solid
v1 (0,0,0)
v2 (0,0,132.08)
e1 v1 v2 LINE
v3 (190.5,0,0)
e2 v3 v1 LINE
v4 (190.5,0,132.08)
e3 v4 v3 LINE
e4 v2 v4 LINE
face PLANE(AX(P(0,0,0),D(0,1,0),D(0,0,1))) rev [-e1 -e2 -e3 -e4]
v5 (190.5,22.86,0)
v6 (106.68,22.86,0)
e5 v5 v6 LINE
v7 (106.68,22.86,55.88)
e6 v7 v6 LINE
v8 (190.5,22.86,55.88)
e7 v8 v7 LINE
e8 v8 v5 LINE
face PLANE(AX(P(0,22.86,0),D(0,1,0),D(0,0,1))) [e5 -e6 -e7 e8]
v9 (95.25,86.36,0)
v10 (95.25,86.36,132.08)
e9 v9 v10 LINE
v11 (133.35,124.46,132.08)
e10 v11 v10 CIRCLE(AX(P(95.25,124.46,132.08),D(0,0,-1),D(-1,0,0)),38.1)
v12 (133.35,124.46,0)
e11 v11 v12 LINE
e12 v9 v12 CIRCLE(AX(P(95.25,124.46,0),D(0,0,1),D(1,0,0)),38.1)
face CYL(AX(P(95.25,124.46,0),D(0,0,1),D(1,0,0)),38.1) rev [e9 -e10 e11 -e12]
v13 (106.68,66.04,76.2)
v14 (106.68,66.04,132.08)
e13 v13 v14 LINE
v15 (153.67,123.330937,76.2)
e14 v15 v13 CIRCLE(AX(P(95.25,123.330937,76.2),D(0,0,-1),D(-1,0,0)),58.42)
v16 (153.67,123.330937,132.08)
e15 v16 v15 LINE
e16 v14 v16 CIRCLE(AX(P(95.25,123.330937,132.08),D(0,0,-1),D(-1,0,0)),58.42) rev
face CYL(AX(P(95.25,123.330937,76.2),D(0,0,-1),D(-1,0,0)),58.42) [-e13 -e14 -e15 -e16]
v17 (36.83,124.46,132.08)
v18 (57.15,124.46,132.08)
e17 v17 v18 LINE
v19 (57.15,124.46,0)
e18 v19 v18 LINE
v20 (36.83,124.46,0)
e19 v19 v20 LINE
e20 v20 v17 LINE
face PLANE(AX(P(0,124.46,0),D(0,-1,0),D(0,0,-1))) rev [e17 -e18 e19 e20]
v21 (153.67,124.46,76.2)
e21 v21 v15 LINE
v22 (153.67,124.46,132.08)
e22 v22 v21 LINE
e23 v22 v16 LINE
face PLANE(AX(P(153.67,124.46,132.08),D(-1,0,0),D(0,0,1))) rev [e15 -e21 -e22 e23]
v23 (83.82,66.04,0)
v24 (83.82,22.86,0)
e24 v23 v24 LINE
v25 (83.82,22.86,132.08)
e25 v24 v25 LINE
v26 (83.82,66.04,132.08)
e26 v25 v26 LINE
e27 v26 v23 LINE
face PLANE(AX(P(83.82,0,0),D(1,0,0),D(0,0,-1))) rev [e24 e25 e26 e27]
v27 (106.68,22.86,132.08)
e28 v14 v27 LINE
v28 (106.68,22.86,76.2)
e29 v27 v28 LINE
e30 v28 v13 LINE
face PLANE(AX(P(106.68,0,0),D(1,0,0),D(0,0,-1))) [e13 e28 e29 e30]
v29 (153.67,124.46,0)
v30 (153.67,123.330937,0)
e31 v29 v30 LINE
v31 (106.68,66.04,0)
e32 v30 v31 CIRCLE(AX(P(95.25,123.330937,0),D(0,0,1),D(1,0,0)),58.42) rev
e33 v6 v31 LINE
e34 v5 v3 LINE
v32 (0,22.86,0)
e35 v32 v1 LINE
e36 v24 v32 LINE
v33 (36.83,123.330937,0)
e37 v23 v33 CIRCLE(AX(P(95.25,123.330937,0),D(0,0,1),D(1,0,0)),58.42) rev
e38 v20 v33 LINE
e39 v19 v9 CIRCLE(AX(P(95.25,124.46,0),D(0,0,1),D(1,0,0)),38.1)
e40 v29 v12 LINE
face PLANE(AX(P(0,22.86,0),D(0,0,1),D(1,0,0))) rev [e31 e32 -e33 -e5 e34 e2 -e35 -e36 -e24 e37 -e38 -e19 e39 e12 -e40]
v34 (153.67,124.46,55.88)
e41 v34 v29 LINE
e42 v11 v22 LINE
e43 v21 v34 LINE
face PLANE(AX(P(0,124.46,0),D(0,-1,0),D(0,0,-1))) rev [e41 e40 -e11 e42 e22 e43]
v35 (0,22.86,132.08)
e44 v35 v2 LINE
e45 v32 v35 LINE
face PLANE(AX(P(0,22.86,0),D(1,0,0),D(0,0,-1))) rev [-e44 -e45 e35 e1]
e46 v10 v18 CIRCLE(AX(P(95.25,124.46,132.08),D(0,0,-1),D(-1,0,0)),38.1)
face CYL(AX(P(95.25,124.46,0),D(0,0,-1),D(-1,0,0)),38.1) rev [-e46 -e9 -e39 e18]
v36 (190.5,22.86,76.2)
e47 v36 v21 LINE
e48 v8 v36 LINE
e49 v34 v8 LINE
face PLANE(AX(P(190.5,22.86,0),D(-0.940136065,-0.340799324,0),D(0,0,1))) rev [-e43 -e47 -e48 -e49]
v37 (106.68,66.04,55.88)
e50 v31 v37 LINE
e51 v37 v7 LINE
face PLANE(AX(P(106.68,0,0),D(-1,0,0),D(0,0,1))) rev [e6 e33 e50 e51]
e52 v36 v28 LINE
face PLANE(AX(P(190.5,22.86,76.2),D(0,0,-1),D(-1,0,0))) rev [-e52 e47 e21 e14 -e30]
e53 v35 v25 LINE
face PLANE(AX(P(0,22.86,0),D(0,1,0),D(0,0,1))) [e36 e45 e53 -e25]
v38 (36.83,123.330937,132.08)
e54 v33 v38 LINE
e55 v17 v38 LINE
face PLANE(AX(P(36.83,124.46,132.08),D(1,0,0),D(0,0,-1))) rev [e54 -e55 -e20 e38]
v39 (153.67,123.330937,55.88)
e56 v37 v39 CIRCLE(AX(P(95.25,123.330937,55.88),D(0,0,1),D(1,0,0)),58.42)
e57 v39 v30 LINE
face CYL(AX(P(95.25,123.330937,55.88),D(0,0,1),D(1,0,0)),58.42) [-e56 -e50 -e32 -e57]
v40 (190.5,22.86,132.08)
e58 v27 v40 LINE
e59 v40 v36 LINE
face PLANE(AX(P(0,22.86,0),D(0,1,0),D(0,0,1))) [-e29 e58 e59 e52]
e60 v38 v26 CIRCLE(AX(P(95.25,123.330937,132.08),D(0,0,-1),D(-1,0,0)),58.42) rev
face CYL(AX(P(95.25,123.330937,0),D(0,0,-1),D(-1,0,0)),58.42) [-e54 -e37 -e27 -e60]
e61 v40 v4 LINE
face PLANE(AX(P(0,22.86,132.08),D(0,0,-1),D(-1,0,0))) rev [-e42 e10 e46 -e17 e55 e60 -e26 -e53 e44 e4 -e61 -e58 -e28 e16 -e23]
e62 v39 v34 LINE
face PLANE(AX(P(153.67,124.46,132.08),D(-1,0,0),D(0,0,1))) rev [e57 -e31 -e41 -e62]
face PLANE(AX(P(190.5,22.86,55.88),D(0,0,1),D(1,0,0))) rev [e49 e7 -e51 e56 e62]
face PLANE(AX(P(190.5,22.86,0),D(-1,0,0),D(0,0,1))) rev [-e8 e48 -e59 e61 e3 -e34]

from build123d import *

# Parameters (mm, degrees)
SKETCH1_W           = 190.5
SKETCH1_H           = 132.08
BOSS_EXTRUDE1_DEPTH = 22.86
SKETCH2_W           = 116.84
SKETCH2_H           = 132.08
BOSS_EXTRUDE2_DEPTH = 101.6
SKETCH3_W           = 20.32
SKETCH3_H           = 101.6
BOSS_EXTRUDE3_DEPTH = 36.83
SKETCH5_W           = 55.88
SKETCH5_H           = 43.18
CUT_EXTRUDE1_DEPTH  = 46.99
SKETCH4_W           = 55.88
SKETCH4_H           = 43.18
CUT_EXTRUDE2_DEPTH  = 46.99
SKETCH6_W           = 132.08
SKETCH6_H           = 43.18
CUT_EXTRUDE3_DEPTH  = 46.99
SKETCH10_W          = 76.2
SKETCH10_H          = 132.08
CUT_EXTRUDE4_DEPTH  = 38.1
CHAMFER1_SIZE       = 36.83
CHAMFER1_SIZE2      = 101.6
FILLET1_R           = 58.42
FILLET2_R           = 38.1


# Some blends are built 0.0001 mm under size
with BuildPart() as part:
    # Sketch1 → Boss-Extrude1 (new body)
    with BuildSketch(Plane(origin=(0, 0, 0), x_dir=(1, 0, 0), z_dir=(0, 1, 0))):
        with Locations((95.25, -66.04)):
            Rectangle(SKETCH1_W, SKETCH1_H)
    extrude(amount=BOSS_EXTRUDE1_DEPTH)

    # Sketch2 → Boss-Extrude2 (add)
    with BuildSketch(Plane(origin=(0, 22.86, 0), x_dir=(1, 0, 0), z_dir=(0, 1, 0))):
        with Locations((95.25, -66.04)):
            Rectangle(SKETCH2_W, SKETCH2_H)
    extrude(amount=BOSS_EXTRUDE2_DEPTH)

    # Sketch3 → Boss-Extrude3 (add)
    with BuildSketch(Plane(origin=(153.67, 0, 0), x_dir=(0, 0, -1), z_dir=(1, 0, 0))):
        with Locations((-66.04, 73.66)):
            Rectangle(SKETCH3_W, SKETCH3_H)
    extrude(amount=BOSS_EXTRUDE3_DEPTH)

    # Sketch5 → Cut-Extrude1 (cut)
    with BuildSketch(Plane(origin=(153.67, 0, 0), x_dir=(0, 0, -1), z_dir=(1, 0, 0))):
        with Locations((-27.94, 44.45)):
            Rectangle(SKETCH5_W, SKETCH5_H)
    extrude(amount=-CUT_EXTRUDE1_DEPTH, mode=Mode.SUBTRACT)

    # Sketch4 → Cut-Extrude2 (cut)
    with BuildSketch(Plane(origin=(153.67, 0, 0), x_dir=(0, 0, -1), z_dir=(1, 0, 0))):
        with Locations((-104.14, 44.45)):
            Rectangle(SKETCH4_W, SKETCH4_H)
    extrude(amount=-CUT_EXTRUDE2_DEPTH, mode=Mode.SUBTRACT)

    # Sketch6 → Cut-Extrude3 (cut)
    with BuildSketch(Plane.ZY.offset(-36.83)):
        with Locations((66.04, 44.45)):
            Rectangle(SKETCH6_W, SKETCH6_H)
    extrude(amount=-CUT_EXTRUDE3_DEPTH, mode=Mode.SUBTRACT)

    # Sketch10 → Cut-Extrude4 (cut)
    with BuildSketch(Plane(origin=(0, 124.46, 0), x_dir=(1, 0, 0), z_dir=(0, 1, 0))):
        with Locations((95.25, -66.04)):
            Rectangle(SKETCH10_W, SKETCH10_H)
    extrude(amount=-CUT_EXTRUDE4_DEPTH, mode=Mode.SUBTRACT)

    # Chamfer1
    chamfer1_edges = [part.edges().sort_by_distance(p)[0] for p in [
        (190.5, 124.46, 66.04),
    ]]
    chamfer1_side = [part.faces().sort_by_distance(p)[0] for p in [
        (149.740639098, 124.46, 66.04),
    ]]
    chamfer(chamfer1_edges, length=CHAMFER1_SIZE, length2=CHAMFER1_SIZE2, reference=chamfer1_side[0])

    # Fillet1
    # the kernel refuses this fillet: 58.42 mm, written as the material it takes off along each edge
    with BuildSketch(Plane(origin=(36.83, 66.04, 275.307343322), x_dir=(0, 1, 0), z_dir=(0, 0, -1))) as fillet1_piece_1:
        with BuildLine():
            CenterArc((57.290937329, 58.42), FILLET1_R, 191.282824288, 78.717175712)
            Line((0, 46.99), (-1.145818747, 46.7614))
            ThreePointArc((-1.145818747, 46.7614), (-1.1684, 23.495), (-1.1684, 0))
            Line((-1.1684, 0), (0, -1.1684))
            Line((0, -1.1684), (57.290937329, -1.1684))
            Line((57.290937329, -1.1684), (57.290937329, 0))
        make_face()
    extrude(amount=418.534686643, mode=Mode.SUBTRACT)
    with BuildSketch(Plane(origin=(153.67, 66.04, -143.227343322), x_dir=(-1, 0, 0), z_dir=(0, 0, 1))) as fillet1_piece_2:
        with BuildLine():
            CenterArc((58.42, -57.290937329), FILLET1_R, 101.282824288, 78.717175712)
            Line((0, -57.290937329), (-1.1684, -57.290937329))
            Line((-1.1684, -57.290937329), (-1.1684, 0))
            Line((-1.1684, 0), (0, 1.1684))
            ThreePointArc((0, 1.1684), (23.495, 1.1684), (46.7614, 1.145818747))
            Line((46.7614, 1.145818747), (46.99, 0))
        make_face()
    extrude(amount=199.107343322, mode=Mode.SUBTRACT)
    with BuildSketch(Plane(origin=(153.67, 66.04, -143.227343322), x_dir=(-1, 0, 0), z_dir=(0, 0, 1))) as fillet1_piece_3_section:
        with BuildLine():
            CenterArc((58.42, -57.290937329), FILLET1_R, 101.282824288, 78.717175712)
            Line((0, -57.290937329), (-1.1684, -57.290937329))
            Line((-1.1684, -57.290937329), (-1.1684, 0))
            Line((-1.1684, 0), (0, 1.1684))
            ThreePointArc((0, 1.1684), (23.495, 1.1684), (46.7614, 1.145818747))
            Line((46.7614, 1.145818747), (46.99, 0))
        make_face()
    fillet1_piece_3 = extrude(amount=342.334686643, mode=Mode.PRIVATE)
    fillet1_piece_3 = split(fillet1_piece_3, bisect_by=Plane(origin=(141.963702204, 79.396824985, 76.2), z_dir=(0, 0, 1)), keep=Keep.TOP, mode=Mode.PRIVATE)
    add(fillet1_piece_3, mode=Mode.SUBTRACT)
    with BuildSketch(Plane(origin=(153.67, 66.04, 275.307343322), x_dir=(0, 1, 0), z_dir=(0, 0, -1))) as fillet1_piece_4:
        with BuildLine():
            CenterArc((57.290937329, -58.42), FILLET1_R, 90, 78.717175712)
            Line((0, -46.99), (-1.145818747, -46.7614))
            ThreePointArc((-1.145818747, -46.7614), (-1.1684, -23.495), (-1.1684, 0))
            Line((-1.1684, 0), (0, 1.1684))
            Line((0, 1.1684), (57.290937329, 1.1684))
            Line((57.290937329, 1.1684), (57.290937329, 0))
        make_face()
    extrude(amount=199.107343322, mode=Mode.SUBTRACT)
    with BuildSketch(Plane(origin=(153.67, 66.04, 275.307343322), x_dir=(0, 1, 0), z_dir=(0, 0, -1))) as fillet1_piece_5_section:
        with BuildLine():
            CenterArc((57.290937329, -58.42), FILLET1_R, 90, 78.717175712)
            Line((0, -46.99), (-1.145818747, -46.7614))
            ThreePointArc((-1.145818747, -46.7614), (-1.1684, -23.495), (-1.1684, 0))
            Line((-1.1684, 0), (0, 1.1684))
            Line((0, 1.1684), (57.290937329, 1.1684))
            Line((57.290937329, 1.1684), (57.290937329, 0))
        make_face()
    fillet1_piece_5 = extrude(amount=342.334686643, mode=Mode.PRIVATE)
    fillet1_piece_5 = split(fillet1_piece_5, bisect_by=Plane(origin=(141.963702204, 79.396824985, 55.88), z_dir=(0, 0, -1)), keep=Keep.TOP, mode=Mode.PRIVATE)
    add(fillet1_piece_5, mode=Mode.SUBTRACT)

    # Fillet2
    fillet2_edges = [part.edges().sort_by_distance(p)[0] for p in [
        (133.35, 86.36, 66.04),
        (57.15, 86.36, 66.04),
    ]]
    fillet(fillet2_edges, radius=FILLET2_R - 0.0001)  # a hair under: the kernel refuses the full size


solid = part.part
